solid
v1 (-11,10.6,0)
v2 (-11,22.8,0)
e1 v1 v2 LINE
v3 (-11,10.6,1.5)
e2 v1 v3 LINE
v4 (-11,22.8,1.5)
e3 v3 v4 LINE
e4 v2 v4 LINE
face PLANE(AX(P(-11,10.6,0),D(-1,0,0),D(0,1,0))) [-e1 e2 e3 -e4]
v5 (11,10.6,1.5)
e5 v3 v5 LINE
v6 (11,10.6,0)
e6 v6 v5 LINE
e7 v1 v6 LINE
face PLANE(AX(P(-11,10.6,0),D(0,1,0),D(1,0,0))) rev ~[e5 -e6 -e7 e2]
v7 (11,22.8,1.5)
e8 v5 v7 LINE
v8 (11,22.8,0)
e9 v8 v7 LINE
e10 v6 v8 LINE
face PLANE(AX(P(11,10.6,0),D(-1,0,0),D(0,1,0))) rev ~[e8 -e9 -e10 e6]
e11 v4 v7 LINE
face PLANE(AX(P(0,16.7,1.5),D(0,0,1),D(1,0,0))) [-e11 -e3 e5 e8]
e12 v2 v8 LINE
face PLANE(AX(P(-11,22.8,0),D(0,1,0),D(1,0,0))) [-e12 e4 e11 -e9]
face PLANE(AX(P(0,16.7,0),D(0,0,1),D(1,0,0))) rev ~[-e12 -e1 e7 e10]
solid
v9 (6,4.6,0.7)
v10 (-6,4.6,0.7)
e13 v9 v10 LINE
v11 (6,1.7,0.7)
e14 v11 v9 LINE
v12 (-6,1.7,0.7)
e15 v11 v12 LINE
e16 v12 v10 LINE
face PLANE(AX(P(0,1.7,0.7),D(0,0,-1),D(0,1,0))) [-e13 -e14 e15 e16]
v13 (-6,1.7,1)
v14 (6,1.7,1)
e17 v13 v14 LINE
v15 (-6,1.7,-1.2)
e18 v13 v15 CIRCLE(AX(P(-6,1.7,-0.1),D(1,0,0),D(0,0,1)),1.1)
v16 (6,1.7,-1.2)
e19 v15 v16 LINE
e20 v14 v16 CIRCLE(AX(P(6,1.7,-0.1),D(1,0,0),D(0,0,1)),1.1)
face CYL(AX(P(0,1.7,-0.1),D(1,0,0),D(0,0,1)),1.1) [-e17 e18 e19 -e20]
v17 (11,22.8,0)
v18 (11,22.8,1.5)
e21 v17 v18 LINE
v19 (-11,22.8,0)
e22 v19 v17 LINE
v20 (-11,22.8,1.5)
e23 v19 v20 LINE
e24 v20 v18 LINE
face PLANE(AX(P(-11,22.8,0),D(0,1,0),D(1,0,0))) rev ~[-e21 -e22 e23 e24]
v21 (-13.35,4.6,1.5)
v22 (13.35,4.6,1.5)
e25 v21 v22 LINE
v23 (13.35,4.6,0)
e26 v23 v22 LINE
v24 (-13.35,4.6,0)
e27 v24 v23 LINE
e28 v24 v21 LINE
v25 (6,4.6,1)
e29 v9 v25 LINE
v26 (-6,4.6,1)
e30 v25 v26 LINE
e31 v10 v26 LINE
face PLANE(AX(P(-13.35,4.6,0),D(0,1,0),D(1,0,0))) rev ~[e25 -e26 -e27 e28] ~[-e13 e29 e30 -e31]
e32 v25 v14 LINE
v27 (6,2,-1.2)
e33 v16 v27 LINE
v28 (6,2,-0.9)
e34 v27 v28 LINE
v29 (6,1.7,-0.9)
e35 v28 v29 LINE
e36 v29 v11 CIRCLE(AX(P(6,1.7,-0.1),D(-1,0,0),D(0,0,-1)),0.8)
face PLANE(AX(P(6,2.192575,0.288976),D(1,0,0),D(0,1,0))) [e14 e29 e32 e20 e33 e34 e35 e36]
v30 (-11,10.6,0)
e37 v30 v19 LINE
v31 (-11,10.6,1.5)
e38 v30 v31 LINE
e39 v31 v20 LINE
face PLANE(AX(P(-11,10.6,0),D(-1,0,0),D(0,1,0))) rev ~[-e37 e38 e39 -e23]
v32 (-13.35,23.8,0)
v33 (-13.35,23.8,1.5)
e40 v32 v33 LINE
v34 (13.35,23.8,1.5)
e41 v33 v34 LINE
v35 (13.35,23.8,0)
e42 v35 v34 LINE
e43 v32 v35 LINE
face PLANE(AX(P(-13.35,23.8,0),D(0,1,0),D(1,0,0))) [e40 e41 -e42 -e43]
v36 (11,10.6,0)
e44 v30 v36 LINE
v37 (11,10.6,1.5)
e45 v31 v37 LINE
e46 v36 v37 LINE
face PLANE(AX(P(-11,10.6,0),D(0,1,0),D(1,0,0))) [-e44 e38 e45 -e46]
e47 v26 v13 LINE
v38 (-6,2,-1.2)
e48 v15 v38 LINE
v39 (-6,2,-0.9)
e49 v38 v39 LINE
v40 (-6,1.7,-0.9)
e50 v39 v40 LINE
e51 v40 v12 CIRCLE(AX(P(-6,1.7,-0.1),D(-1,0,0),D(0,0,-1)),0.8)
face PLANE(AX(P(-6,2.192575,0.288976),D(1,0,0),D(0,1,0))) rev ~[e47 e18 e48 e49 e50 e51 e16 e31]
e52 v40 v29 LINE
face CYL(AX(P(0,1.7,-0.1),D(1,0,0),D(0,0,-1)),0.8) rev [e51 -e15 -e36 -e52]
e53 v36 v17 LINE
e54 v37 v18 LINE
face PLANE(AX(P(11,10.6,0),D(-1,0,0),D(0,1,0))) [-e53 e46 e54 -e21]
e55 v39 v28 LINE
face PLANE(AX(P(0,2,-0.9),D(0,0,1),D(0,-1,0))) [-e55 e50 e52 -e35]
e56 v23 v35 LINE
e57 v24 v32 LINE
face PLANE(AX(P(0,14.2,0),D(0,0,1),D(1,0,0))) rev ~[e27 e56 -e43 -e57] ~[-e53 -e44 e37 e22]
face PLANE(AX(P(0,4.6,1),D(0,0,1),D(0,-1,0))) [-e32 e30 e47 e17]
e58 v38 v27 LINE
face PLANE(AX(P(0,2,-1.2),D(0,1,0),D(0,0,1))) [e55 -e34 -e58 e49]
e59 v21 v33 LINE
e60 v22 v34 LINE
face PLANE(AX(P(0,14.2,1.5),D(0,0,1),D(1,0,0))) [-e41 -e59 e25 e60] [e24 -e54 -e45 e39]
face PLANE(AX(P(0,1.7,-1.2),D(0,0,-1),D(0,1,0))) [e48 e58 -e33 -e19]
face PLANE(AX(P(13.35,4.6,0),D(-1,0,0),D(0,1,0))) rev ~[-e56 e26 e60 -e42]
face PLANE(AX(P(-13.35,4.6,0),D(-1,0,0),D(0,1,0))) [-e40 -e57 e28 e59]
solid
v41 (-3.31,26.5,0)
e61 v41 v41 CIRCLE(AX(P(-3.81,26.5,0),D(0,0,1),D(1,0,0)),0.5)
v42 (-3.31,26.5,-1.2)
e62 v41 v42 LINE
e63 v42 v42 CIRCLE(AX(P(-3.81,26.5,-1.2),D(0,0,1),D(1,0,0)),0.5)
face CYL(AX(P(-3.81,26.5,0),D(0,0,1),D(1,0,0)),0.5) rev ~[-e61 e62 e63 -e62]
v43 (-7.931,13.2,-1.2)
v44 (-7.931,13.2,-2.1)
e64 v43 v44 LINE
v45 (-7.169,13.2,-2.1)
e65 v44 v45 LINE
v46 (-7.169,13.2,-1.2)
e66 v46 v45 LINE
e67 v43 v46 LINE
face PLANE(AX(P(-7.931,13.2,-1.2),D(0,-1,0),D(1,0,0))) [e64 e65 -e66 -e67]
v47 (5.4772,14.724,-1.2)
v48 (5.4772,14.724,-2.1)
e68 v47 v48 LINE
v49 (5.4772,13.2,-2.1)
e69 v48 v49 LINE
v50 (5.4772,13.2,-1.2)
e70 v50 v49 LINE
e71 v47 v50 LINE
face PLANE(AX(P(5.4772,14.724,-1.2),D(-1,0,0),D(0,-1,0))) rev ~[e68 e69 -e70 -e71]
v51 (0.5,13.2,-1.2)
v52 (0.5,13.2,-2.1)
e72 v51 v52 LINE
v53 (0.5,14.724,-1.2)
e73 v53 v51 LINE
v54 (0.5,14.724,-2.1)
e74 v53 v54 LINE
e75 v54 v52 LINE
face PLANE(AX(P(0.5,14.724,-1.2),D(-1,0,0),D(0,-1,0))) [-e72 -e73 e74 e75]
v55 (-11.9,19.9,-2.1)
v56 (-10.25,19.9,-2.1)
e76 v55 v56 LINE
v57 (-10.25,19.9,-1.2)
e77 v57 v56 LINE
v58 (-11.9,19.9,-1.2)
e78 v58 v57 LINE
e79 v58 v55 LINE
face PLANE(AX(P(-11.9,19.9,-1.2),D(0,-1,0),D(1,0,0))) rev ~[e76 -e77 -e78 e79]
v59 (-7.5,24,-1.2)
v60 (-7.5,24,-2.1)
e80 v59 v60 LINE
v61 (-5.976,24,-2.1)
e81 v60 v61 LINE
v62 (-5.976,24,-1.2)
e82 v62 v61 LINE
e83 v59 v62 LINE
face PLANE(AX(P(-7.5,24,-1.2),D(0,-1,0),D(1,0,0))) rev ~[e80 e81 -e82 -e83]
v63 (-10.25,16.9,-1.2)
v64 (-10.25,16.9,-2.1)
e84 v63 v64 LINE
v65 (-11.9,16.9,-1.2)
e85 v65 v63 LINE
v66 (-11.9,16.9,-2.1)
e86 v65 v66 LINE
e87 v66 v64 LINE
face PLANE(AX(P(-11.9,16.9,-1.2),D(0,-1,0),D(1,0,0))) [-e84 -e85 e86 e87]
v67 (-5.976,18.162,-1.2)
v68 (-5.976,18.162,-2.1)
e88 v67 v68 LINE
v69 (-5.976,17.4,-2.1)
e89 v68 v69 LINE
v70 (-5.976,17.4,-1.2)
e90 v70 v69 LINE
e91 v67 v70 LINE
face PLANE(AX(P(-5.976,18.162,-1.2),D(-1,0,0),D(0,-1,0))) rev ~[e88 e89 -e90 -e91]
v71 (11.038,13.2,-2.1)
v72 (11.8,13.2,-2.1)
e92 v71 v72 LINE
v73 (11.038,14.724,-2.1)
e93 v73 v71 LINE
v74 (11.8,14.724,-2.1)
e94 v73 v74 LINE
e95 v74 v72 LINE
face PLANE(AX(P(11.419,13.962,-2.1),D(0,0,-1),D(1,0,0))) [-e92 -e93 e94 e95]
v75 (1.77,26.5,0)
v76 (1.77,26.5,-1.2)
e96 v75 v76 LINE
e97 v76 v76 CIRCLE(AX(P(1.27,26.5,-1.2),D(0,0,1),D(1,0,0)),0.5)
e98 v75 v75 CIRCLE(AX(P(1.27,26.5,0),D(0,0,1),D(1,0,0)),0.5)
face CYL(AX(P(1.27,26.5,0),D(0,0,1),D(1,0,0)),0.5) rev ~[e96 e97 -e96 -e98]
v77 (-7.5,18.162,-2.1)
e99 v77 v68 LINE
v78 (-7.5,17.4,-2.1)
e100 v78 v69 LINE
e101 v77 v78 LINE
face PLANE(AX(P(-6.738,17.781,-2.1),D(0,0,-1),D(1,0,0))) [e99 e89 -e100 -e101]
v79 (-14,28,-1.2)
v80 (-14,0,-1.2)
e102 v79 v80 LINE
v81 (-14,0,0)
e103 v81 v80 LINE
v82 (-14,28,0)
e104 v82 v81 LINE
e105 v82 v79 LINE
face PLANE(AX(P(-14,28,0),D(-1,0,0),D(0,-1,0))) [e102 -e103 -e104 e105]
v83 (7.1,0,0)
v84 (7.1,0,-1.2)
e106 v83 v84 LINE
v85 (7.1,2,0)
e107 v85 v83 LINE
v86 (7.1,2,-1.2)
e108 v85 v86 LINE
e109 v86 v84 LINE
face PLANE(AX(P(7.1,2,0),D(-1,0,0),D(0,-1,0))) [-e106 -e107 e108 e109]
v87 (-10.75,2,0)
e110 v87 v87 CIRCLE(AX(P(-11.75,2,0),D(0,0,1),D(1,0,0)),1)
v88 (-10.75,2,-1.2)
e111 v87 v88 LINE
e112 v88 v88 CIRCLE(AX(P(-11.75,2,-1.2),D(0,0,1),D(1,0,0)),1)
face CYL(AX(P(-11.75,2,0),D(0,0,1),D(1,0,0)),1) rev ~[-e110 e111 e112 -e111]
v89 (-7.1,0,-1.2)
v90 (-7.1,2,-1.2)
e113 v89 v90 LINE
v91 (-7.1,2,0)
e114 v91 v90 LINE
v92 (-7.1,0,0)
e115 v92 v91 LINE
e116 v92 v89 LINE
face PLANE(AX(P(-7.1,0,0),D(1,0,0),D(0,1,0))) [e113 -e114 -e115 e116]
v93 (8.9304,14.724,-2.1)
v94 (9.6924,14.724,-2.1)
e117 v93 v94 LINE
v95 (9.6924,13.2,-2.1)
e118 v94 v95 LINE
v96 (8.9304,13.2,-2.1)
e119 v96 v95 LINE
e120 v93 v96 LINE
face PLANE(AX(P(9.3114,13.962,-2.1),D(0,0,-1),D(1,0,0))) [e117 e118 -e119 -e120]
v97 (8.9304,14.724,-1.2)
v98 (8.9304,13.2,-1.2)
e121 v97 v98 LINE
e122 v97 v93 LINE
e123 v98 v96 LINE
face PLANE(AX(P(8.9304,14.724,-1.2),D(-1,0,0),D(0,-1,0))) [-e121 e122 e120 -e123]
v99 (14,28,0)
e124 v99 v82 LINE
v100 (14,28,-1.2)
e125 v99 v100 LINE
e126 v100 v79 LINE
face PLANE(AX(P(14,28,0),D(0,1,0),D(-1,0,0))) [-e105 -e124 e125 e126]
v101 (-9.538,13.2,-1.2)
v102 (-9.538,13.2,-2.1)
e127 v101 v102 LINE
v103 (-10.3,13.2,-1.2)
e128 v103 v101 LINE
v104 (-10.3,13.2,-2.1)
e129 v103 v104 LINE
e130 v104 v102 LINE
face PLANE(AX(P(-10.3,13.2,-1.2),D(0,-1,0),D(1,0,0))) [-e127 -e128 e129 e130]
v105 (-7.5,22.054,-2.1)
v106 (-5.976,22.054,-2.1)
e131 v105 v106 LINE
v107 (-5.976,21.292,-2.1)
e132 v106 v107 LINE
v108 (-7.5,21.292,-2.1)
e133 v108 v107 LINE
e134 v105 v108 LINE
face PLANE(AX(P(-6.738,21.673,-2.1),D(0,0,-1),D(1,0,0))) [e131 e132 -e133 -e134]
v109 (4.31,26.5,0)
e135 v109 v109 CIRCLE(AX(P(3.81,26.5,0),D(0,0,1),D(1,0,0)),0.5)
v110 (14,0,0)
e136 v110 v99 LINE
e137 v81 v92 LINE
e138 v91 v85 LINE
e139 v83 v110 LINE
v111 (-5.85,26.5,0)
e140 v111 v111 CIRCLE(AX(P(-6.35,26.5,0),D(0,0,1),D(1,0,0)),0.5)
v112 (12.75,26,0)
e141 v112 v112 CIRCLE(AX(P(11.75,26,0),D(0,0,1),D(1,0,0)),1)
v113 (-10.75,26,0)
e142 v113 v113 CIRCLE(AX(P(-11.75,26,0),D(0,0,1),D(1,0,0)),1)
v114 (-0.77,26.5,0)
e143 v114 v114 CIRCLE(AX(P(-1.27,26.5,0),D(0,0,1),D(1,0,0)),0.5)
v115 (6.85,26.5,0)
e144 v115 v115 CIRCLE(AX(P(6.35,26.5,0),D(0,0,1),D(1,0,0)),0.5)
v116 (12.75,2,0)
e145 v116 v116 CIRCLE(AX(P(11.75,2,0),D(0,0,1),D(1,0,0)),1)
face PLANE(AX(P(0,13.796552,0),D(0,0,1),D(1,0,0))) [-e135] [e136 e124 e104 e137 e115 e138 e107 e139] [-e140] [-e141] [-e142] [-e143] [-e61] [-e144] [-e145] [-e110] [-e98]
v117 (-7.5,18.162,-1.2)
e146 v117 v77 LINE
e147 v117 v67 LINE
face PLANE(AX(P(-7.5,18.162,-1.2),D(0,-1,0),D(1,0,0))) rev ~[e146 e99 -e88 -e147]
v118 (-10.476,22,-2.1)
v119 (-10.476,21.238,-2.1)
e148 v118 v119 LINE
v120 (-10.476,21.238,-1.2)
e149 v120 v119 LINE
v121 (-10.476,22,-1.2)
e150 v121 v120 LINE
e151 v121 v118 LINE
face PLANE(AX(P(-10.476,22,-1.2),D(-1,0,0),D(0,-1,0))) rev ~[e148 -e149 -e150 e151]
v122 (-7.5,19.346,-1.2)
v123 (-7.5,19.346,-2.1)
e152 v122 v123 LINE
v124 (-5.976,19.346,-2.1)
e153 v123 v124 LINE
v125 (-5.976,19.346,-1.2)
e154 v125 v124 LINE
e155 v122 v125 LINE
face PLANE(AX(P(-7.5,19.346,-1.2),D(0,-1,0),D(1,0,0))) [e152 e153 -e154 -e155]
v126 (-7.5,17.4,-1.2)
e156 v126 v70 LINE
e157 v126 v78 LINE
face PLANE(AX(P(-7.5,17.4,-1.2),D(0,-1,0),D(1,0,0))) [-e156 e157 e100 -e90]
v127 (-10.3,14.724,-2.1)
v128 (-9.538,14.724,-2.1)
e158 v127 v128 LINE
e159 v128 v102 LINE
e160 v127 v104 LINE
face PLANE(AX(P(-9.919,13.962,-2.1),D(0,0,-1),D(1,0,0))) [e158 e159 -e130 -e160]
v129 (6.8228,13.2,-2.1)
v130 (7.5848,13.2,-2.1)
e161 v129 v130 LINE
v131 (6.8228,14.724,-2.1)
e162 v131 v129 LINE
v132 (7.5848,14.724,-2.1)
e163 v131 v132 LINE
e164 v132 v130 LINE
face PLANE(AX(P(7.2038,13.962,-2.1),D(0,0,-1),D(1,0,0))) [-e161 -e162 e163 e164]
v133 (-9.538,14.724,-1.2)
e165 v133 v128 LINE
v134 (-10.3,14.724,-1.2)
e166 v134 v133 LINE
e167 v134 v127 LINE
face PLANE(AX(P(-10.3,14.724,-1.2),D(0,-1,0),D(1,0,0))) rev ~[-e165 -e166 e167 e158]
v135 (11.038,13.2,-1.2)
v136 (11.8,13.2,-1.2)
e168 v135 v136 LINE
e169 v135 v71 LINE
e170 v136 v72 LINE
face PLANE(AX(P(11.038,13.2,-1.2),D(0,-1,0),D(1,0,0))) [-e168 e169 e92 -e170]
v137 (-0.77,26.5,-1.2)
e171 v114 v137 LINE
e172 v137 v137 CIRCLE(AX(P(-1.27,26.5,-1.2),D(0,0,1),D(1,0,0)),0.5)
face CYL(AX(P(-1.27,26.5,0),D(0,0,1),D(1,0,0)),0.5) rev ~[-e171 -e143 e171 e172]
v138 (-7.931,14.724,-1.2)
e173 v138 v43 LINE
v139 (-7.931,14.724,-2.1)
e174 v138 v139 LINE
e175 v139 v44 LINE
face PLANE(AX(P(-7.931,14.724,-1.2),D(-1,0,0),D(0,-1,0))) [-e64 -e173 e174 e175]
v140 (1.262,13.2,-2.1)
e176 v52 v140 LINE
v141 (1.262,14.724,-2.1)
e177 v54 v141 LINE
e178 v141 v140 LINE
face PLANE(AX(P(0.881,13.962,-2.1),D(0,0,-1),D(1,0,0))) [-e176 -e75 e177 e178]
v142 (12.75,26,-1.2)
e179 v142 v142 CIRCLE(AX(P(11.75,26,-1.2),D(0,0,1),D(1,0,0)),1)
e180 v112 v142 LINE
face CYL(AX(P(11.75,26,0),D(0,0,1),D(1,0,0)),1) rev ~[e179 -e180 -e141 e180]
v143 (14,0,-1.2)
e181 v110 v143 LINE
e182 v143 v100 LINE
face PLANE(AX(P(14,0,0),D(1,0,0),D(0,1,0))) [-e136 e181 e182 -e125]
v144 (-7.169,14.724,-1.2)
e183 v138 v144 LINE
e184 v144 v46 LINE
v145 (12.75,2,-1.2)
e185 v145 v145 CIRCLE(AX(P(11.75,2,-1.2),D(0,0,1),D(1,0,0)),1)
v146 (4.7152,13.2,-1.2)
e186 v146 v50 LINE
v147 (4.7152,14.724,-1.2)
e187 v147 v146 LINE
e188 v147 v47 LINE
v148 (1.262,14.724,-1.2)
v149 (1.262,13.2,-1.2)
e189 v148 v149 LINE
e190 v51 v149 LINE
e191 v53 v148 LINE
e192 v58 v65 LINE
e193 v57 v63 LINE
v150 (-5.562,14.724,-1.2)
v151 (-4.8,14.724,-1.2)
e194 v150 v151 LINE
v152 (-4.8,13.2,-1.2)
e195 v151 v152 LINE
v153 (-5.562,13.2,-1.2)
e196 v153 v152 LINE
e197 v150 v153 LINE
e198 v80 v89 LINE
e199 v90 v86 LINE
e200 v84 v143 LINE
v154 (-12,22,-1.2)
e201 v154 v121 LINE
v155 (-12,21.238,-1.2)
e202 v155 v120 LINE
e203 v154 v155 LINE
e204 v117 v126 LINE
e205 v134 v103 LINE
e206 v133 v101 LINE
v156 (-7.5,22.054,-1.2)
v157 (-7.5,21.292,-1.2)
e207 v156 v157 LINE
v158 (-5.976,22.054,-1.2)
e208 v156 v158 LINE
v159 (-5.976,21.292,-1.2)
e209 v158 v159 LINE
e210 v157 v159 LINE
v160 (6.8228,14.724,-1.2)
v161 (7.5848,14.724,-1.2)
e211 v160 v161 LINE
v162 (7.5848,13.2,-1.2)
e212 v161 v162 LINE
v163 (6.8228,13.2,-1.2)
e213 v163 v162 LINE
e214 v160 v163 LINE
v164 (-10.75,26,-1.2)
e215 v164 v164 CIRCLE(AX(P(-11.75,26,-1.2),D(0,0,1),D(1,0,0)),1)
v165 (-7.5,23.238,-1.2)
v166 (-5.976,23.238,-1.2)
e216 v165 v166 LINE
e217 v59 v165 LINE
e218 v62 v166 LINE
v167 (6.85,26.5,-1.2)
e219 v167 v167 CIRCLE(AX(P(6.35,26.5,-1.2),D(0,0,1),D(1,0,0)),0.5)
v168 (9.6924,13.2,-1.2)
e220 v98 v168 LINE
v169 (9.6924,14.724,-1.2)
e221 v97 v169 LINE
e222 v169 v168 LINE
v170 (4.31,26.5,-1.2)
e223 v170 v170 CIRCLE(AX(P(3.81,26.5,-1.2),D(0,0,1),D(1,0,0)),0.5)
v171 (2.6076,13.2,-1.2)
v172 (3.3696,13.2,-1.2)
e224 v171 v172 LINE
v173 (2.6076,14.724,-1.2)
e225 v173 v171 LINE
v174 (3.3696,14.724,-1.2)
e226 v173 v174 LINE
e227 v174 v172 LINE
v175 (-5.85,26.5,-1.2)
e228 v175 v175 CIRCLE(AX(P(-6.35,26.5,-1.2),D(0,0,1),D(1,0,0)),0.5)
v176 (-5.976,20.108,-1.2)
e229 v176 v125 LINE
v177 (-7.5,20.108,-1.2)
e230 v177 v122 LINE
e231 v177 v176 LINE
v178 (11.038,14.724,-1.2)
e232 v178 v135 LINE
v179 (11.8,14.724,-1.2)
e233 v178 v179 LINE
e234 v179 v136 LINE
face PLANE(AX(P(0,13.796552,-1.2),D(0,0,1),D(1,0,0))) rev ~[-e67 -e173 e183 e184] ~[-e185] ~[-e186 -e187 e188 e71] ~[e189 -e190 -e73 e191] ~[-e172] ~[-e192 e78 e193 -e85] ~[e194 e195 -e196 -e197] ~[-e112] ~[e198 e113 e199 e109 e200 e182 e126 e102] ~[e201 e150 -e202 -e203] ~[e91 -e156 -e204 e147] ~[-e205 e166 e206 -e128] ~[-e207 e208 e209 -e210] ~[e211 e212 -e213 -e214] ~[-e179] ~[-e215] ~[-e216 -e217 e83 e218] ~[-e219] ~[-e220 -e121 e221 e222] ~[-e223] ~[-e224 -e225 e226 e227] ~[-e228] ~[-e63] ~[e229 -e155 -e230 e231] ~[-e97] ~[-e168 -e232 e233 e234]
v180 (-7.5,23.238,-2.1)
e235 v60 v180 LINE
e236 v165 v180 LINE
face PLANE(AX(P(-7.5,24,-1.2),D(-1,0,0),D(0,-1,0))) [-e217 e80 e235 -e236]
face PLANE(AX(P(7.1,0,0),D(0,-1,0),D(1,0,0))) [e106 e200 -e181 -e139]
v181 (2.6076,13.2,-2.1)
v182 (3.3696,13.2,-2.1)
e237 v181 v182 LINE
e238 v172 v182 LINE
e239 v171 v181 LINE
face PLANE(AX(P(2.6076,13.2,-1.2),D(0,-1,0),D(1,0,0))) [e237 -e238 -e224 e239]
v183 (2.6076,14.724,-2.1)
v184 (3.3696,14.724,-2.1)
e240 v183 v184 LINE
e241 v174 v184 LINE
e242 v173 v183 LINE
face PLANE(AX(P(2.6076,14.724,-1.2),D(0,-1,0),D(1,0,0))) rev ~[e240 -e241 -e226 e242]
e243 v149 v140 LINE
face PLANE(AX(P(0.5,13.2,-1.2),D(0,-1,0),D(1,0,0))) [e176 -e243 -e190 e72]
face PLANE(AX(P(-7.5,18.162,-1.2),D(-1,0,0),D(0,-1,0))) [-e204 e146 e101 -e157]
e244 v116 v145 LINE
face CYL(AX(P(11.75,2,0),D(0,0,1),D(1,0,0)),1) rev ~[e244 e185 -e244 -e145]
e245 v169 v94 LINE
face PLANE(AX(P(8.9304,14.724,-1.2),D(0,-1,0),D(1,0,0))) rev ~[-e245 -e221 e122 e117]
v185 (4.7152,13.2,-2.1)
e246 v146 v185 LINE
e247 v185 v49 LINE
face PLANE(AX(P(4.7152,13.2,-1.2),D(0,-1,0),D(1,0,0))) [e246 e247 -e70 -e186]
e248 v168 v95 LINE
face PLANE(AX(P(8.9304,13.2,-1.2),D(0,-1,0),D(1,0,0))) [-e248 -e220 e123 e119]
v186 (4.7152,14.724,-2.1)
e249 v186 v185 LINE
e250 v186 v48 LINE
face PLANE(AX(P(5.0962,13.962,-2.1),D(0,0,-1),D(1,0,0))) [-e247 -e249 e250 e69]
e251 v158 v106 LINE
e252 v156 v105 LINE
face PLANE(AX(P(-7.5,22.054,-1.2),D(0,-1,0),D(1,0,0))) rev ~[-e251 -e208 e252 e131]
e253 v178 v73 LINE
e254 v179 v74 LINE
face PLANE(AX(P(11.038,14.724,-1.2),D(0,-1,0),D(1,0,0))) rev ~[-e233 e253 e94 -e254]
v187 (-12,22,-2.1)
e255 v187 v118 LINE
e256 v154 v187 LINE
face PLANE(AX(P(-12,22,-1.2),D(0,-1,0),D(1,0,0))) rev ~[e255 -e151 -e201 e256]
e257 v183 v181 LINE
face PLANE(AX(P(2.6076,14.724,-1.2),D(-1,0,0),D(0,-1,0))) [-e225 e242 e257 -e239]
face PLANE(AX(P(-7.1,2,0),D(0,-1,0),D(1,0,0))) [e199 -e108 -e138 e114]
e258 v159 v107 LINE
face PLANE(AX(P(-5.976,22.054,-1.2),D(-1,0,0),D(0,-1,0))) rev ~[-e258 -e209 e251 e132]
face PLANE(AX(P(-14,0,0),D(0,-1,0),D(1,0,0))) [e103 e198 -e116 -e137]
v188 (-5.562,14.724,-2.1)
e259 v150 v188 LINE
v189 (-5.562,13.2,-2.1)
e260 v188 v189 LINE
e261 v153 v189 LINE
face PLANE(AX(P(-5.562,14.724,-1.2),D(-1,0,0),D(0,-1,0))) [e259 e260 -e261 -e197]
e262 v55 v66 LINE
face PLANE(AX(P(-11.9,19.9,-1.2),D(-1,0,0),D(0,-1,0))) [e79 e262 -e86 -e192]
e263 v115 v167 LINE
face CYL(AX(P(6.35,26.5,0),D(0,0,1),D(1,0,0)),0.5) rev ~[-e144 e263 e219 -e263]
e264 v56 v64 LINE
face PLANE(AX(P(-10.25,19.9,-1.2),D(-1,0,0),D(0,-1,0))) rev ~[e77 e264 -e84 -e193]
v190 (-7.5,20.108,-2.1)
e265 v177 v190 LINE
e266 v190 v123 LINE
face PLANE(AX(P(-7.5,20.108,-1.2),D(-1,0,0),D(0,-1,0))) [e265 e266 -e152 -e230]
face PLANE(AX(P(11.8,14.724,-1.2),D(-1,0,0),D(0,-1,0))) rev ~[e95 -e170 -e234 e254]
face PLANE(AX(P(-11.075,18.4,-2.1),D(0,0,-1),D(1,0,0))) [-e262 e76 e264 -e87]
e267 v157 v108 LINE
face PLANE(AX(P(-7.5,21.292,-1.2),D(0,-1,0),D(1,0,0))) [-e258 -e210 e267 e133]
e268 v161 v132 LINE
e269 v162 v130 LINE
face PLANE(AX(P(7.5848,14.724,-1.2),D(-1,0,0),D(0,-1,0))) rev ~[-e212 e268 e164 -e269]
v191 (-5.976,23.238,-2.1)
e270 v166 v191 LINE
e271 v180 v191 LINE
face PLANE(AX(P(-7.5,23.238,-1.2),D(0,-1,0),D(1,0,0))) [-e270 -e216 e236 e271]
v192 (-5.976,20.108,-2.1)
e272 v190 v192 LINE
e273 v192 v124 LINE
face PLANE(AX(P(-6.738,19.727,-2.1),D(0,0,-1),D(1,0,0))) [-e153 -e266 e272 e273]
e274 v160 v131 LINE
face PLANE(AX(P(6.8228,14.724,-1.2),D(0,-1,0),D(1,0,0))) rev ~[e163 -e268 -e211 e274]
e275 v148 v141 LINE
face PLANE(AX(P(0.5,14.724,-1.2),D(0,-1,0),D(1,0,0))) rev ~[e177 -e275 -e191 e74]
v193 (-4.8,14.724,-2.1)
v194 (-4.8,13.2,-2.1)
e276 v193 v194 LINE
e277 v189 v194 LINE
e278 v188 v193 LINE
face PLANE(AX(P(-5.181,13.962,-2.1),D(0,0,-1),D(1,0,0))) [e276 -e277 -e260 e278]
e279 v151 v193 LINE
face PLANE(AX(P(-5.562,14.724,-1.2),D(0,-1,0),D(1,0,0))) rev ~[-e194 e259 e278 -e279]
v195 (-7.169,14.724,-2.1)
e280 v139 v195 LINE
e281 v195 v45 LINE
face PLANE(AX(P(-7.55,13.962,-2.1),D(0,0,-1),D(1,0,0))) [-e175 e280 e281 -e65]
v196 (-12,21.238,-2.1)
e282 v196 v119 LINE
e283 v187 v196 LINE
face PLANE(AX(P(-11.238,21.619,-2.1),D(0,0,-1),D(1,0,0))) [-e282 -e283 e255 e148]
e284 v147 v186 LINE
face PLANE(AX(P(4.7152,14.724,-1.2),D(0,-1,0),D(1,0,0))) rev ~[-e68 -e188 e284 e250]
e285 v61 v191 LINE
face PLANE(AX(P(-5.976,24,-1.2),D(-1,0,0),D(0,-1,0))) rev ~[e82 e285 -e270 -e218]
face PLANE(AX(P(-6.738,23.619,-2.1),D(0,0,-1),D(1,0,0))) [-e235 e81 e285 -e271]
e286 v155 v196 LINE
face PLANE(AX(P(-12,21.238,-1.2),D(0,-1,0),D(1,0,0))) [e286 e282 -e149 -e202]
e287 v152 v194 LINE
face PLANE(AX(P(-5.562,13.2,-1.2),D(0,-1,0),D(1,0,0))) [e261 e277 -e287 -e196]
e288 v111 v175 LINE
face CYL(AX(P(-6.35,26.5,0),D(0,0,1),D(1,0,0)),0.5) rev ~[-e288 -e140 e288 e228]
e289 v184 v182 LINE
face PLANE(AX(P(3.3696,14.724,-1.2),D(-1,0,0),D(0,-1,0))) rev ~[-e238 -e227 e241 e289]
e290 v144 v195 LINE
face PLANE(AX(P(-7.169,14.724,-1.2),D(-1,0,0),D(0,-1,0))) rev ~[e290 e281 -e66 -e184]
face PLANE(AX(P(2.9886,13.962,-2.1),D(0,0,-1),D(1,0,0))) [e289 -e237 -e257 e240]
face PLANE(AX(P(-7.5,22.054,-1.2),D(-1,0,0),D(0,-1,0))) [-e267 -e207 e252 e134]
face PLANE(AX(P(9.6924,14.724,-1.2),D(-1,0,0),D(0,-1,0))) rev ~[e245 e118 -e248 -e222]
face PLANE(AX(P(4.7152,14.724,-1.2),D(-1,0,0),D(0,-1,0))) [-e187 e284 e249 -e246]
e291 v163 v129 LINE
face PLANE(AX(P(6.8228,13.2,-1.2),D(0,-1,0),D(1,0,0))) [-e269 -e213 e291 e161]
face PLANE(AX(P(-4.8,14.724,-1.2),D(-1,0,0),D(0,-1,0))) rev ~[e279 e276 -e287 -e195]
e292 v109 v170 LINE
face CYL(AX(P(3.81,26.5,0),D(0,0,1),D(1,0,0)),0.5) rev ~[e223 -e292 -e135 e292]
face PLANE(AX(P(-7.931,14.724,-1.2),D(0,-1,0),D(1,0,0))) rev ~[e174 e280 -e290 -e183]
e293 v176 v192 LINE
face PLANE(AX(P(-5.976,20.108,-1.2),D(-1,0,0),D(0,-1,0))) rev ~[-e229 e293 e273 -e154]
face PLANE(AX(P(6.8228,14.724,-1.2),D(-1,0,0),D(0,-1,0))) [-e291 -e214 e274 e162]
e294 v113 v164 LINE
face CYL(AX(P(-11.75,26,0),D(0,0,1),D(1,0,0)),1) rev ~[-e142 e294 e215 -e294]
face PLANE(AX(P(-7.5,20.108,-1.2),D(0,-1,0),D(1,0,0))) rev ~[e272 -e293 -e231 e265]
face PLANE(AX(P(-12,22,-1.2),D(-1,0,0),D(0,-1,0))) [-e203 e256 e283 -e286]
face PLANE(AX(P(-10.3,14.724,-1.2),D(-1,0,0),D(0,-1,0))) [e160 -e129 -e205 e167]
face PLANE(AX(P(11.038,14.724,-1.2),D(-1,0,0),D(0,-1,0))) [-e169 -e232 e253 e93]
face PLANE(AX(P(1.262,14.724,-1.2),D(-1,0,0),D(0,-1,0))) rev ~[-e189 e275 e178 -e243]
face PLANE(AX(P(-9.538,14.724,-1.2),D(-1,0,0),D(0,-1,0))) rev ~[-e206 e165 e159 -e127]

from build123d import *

# Parameters (mm, degrees)
F0_R     = 1
F0_R_2   = 0.5
F1_DEPTH = 1.2
F2_W     = 26.7
F2_H     = 19.2
F2_W_2   = 22
F2_H_2   = 12.2
F3_DEPTH = 1.5
F4_DEPTH = 1.5
F6_DEPTH = 6
F7_W     = 0.762
F7_H     = 1.524
F7_W_2   = 1.65
F7_H_2   = 3
F7_W_3   = 1.524
F7_H_3   = 0.762
F8_DEPTH = 0.9


with BuildPart() as f1:
    # F0 (on Top) → F1 (new body)
    with BuildSketch(Plane.XY):
        Polygon((14, 0), (14, 28), (-14, 28), (-14, 0), (-7.1, 0), (-7.1, 2), (7.1, 2), (7.1, 0), align=None)
        with Locations((-11.75, 2)):
            Circle(F0_R, mode=Mode.SUBTRACT)
        with Locations((11.75, 2)):
            Circle(F0_R, mode=Mode.SUBTRACT)
        with Locations((-11.75, 26)):
            Circle(F0_R, mode=Mode.SUBTRACT)
        with Locations((-6.35, 26.5)):
            Circle(F0_R_2, mode=Mode.SUBTRACT)
        with Locations((-3.81, 26.5)):
            Circle(F0_R_2, mode=Mode.SUBTRACT)
        with Locations((-1.27, 26.5)):
            Circle(F0_R_2, mode=Mode.SUBTRACT)
        with Locations((1.27, 26.5)):
            Circle(F0_R_2, mode=Mode.SUBTRACT)
        with Locations((3.81, 26.5)):
            Circle(F0_R_2, mode=Mode.SUBTRACT)
        with Locations((6.35, 26.5)):
            Circle(F0_R_2, mode=Mode.SUBTRACT)
        with Locations((11.75, 26)):
            Circle(F0_R, mode=Mode.SUBTRACT)
    extrude(amount=-F1_DEPTH)

    # F7 (on face) → F8 (join)
    with BuildSketch(Plane(origin=(0, 0, -1.2), x_dir=(1, 0, 0), z_dir=(0, 0, -1))):
        with Locations((11.419, -13.962)):
            Rectangle(F7_W, F7_H)
        with Locations((9.3114, -13.962)):
            Rectangle(F7_W, F7_H)
        with Locations((7.2038, -13.962)):
            Rectangle(F7_W, F7_H)
        with Locations((5.0962, -13.962)):
            Rectangle(F7_W, F7_H)
        with Locations((2.9886, -13.962)):
            Rectangle(F7_W, F7_H)
        with Locations((0.881, -13.962)):
            Rectangle(F7_W, F7_H)
        with Locations((-5.181, -13.962)):
            Rectangle(F7_W, F7_H)
        with Locations((-11.075, -18.4)):
            Rectangle(F7_W_2, F7_H_2)
        with Locations((-11.238, -21.619)):
            Rectangle(F7_W_3, F7_H_3)
        with Locations((-6.738, -23.619)):
            Rectangle(F7_W_3, F7_H_3)
        with Locations((-7.55, -13.962)):
            Rectangle(F7_W, F7_H)
        with Locations((-9.919, -13.962)):
            Rectangle(F7_W, F7_H)
        with Locations((-6.738, -21.673)):
            Rectangle(F7_W_3, F7_H_3)
        with Locations((-6.738, -19.727)):
            Rectangle(F7_W_3, F7_H_3)
        with Locations((-6.738, -17.781)):
            Rectangle(F7_W_3, F7_H_3)
    extrude(amount=F8_DEPTH)


with BuildPart() as f3:
    # F2 (on Top) → F3 (new body)
    with BuildSketch(Plane.XY):
        with Locations((0, 14.2)):
            Rectangle(F2_W, F2_H)
        with Locations((0, 16.7)):
            Rectangle(F2_W_2, F2_H_2, mode=Mode.SUBTRACT)
    extrude(amount=F3_DEPTH)

    # F5 (on Right) → F6 (join, symmetric)
    with BuildSketch(Plane.YZ):
        with BuildLine():
            Line((4.6, 1), (1.7, 1))
            ThreePointArc((1.7, 1), (0.6, -0.1), (1.7, -1.2))
            Line((1.7, -1.2), (2, -1.2))
            Line((2, -1.2), (2, -0.9))
            Line((2, -0.9), (1.7, -0.9))
            ThreePointArc((1.7, -0.9), (0.9, -0.1), (1.7, 0.7))
            Line((1.7, 0.7), (4.6, 0.7))
            Line((4.6, 0.7), (4.6, 1))
        make_face()
    extrude(amount=F6_DEPTH, both=True)


with BuildPart() as f4:
    # F2 (on Top) → F4 (new body, through all)
    with BuildSketch(Plane.XY):
        with Locations((0, 16.7)):
            Rectangle(F2_W_2, F2_H_2)
    extrude(amount=F4_DEPTH)


solid = Compound([f1.part, f3.part, f4.part])
